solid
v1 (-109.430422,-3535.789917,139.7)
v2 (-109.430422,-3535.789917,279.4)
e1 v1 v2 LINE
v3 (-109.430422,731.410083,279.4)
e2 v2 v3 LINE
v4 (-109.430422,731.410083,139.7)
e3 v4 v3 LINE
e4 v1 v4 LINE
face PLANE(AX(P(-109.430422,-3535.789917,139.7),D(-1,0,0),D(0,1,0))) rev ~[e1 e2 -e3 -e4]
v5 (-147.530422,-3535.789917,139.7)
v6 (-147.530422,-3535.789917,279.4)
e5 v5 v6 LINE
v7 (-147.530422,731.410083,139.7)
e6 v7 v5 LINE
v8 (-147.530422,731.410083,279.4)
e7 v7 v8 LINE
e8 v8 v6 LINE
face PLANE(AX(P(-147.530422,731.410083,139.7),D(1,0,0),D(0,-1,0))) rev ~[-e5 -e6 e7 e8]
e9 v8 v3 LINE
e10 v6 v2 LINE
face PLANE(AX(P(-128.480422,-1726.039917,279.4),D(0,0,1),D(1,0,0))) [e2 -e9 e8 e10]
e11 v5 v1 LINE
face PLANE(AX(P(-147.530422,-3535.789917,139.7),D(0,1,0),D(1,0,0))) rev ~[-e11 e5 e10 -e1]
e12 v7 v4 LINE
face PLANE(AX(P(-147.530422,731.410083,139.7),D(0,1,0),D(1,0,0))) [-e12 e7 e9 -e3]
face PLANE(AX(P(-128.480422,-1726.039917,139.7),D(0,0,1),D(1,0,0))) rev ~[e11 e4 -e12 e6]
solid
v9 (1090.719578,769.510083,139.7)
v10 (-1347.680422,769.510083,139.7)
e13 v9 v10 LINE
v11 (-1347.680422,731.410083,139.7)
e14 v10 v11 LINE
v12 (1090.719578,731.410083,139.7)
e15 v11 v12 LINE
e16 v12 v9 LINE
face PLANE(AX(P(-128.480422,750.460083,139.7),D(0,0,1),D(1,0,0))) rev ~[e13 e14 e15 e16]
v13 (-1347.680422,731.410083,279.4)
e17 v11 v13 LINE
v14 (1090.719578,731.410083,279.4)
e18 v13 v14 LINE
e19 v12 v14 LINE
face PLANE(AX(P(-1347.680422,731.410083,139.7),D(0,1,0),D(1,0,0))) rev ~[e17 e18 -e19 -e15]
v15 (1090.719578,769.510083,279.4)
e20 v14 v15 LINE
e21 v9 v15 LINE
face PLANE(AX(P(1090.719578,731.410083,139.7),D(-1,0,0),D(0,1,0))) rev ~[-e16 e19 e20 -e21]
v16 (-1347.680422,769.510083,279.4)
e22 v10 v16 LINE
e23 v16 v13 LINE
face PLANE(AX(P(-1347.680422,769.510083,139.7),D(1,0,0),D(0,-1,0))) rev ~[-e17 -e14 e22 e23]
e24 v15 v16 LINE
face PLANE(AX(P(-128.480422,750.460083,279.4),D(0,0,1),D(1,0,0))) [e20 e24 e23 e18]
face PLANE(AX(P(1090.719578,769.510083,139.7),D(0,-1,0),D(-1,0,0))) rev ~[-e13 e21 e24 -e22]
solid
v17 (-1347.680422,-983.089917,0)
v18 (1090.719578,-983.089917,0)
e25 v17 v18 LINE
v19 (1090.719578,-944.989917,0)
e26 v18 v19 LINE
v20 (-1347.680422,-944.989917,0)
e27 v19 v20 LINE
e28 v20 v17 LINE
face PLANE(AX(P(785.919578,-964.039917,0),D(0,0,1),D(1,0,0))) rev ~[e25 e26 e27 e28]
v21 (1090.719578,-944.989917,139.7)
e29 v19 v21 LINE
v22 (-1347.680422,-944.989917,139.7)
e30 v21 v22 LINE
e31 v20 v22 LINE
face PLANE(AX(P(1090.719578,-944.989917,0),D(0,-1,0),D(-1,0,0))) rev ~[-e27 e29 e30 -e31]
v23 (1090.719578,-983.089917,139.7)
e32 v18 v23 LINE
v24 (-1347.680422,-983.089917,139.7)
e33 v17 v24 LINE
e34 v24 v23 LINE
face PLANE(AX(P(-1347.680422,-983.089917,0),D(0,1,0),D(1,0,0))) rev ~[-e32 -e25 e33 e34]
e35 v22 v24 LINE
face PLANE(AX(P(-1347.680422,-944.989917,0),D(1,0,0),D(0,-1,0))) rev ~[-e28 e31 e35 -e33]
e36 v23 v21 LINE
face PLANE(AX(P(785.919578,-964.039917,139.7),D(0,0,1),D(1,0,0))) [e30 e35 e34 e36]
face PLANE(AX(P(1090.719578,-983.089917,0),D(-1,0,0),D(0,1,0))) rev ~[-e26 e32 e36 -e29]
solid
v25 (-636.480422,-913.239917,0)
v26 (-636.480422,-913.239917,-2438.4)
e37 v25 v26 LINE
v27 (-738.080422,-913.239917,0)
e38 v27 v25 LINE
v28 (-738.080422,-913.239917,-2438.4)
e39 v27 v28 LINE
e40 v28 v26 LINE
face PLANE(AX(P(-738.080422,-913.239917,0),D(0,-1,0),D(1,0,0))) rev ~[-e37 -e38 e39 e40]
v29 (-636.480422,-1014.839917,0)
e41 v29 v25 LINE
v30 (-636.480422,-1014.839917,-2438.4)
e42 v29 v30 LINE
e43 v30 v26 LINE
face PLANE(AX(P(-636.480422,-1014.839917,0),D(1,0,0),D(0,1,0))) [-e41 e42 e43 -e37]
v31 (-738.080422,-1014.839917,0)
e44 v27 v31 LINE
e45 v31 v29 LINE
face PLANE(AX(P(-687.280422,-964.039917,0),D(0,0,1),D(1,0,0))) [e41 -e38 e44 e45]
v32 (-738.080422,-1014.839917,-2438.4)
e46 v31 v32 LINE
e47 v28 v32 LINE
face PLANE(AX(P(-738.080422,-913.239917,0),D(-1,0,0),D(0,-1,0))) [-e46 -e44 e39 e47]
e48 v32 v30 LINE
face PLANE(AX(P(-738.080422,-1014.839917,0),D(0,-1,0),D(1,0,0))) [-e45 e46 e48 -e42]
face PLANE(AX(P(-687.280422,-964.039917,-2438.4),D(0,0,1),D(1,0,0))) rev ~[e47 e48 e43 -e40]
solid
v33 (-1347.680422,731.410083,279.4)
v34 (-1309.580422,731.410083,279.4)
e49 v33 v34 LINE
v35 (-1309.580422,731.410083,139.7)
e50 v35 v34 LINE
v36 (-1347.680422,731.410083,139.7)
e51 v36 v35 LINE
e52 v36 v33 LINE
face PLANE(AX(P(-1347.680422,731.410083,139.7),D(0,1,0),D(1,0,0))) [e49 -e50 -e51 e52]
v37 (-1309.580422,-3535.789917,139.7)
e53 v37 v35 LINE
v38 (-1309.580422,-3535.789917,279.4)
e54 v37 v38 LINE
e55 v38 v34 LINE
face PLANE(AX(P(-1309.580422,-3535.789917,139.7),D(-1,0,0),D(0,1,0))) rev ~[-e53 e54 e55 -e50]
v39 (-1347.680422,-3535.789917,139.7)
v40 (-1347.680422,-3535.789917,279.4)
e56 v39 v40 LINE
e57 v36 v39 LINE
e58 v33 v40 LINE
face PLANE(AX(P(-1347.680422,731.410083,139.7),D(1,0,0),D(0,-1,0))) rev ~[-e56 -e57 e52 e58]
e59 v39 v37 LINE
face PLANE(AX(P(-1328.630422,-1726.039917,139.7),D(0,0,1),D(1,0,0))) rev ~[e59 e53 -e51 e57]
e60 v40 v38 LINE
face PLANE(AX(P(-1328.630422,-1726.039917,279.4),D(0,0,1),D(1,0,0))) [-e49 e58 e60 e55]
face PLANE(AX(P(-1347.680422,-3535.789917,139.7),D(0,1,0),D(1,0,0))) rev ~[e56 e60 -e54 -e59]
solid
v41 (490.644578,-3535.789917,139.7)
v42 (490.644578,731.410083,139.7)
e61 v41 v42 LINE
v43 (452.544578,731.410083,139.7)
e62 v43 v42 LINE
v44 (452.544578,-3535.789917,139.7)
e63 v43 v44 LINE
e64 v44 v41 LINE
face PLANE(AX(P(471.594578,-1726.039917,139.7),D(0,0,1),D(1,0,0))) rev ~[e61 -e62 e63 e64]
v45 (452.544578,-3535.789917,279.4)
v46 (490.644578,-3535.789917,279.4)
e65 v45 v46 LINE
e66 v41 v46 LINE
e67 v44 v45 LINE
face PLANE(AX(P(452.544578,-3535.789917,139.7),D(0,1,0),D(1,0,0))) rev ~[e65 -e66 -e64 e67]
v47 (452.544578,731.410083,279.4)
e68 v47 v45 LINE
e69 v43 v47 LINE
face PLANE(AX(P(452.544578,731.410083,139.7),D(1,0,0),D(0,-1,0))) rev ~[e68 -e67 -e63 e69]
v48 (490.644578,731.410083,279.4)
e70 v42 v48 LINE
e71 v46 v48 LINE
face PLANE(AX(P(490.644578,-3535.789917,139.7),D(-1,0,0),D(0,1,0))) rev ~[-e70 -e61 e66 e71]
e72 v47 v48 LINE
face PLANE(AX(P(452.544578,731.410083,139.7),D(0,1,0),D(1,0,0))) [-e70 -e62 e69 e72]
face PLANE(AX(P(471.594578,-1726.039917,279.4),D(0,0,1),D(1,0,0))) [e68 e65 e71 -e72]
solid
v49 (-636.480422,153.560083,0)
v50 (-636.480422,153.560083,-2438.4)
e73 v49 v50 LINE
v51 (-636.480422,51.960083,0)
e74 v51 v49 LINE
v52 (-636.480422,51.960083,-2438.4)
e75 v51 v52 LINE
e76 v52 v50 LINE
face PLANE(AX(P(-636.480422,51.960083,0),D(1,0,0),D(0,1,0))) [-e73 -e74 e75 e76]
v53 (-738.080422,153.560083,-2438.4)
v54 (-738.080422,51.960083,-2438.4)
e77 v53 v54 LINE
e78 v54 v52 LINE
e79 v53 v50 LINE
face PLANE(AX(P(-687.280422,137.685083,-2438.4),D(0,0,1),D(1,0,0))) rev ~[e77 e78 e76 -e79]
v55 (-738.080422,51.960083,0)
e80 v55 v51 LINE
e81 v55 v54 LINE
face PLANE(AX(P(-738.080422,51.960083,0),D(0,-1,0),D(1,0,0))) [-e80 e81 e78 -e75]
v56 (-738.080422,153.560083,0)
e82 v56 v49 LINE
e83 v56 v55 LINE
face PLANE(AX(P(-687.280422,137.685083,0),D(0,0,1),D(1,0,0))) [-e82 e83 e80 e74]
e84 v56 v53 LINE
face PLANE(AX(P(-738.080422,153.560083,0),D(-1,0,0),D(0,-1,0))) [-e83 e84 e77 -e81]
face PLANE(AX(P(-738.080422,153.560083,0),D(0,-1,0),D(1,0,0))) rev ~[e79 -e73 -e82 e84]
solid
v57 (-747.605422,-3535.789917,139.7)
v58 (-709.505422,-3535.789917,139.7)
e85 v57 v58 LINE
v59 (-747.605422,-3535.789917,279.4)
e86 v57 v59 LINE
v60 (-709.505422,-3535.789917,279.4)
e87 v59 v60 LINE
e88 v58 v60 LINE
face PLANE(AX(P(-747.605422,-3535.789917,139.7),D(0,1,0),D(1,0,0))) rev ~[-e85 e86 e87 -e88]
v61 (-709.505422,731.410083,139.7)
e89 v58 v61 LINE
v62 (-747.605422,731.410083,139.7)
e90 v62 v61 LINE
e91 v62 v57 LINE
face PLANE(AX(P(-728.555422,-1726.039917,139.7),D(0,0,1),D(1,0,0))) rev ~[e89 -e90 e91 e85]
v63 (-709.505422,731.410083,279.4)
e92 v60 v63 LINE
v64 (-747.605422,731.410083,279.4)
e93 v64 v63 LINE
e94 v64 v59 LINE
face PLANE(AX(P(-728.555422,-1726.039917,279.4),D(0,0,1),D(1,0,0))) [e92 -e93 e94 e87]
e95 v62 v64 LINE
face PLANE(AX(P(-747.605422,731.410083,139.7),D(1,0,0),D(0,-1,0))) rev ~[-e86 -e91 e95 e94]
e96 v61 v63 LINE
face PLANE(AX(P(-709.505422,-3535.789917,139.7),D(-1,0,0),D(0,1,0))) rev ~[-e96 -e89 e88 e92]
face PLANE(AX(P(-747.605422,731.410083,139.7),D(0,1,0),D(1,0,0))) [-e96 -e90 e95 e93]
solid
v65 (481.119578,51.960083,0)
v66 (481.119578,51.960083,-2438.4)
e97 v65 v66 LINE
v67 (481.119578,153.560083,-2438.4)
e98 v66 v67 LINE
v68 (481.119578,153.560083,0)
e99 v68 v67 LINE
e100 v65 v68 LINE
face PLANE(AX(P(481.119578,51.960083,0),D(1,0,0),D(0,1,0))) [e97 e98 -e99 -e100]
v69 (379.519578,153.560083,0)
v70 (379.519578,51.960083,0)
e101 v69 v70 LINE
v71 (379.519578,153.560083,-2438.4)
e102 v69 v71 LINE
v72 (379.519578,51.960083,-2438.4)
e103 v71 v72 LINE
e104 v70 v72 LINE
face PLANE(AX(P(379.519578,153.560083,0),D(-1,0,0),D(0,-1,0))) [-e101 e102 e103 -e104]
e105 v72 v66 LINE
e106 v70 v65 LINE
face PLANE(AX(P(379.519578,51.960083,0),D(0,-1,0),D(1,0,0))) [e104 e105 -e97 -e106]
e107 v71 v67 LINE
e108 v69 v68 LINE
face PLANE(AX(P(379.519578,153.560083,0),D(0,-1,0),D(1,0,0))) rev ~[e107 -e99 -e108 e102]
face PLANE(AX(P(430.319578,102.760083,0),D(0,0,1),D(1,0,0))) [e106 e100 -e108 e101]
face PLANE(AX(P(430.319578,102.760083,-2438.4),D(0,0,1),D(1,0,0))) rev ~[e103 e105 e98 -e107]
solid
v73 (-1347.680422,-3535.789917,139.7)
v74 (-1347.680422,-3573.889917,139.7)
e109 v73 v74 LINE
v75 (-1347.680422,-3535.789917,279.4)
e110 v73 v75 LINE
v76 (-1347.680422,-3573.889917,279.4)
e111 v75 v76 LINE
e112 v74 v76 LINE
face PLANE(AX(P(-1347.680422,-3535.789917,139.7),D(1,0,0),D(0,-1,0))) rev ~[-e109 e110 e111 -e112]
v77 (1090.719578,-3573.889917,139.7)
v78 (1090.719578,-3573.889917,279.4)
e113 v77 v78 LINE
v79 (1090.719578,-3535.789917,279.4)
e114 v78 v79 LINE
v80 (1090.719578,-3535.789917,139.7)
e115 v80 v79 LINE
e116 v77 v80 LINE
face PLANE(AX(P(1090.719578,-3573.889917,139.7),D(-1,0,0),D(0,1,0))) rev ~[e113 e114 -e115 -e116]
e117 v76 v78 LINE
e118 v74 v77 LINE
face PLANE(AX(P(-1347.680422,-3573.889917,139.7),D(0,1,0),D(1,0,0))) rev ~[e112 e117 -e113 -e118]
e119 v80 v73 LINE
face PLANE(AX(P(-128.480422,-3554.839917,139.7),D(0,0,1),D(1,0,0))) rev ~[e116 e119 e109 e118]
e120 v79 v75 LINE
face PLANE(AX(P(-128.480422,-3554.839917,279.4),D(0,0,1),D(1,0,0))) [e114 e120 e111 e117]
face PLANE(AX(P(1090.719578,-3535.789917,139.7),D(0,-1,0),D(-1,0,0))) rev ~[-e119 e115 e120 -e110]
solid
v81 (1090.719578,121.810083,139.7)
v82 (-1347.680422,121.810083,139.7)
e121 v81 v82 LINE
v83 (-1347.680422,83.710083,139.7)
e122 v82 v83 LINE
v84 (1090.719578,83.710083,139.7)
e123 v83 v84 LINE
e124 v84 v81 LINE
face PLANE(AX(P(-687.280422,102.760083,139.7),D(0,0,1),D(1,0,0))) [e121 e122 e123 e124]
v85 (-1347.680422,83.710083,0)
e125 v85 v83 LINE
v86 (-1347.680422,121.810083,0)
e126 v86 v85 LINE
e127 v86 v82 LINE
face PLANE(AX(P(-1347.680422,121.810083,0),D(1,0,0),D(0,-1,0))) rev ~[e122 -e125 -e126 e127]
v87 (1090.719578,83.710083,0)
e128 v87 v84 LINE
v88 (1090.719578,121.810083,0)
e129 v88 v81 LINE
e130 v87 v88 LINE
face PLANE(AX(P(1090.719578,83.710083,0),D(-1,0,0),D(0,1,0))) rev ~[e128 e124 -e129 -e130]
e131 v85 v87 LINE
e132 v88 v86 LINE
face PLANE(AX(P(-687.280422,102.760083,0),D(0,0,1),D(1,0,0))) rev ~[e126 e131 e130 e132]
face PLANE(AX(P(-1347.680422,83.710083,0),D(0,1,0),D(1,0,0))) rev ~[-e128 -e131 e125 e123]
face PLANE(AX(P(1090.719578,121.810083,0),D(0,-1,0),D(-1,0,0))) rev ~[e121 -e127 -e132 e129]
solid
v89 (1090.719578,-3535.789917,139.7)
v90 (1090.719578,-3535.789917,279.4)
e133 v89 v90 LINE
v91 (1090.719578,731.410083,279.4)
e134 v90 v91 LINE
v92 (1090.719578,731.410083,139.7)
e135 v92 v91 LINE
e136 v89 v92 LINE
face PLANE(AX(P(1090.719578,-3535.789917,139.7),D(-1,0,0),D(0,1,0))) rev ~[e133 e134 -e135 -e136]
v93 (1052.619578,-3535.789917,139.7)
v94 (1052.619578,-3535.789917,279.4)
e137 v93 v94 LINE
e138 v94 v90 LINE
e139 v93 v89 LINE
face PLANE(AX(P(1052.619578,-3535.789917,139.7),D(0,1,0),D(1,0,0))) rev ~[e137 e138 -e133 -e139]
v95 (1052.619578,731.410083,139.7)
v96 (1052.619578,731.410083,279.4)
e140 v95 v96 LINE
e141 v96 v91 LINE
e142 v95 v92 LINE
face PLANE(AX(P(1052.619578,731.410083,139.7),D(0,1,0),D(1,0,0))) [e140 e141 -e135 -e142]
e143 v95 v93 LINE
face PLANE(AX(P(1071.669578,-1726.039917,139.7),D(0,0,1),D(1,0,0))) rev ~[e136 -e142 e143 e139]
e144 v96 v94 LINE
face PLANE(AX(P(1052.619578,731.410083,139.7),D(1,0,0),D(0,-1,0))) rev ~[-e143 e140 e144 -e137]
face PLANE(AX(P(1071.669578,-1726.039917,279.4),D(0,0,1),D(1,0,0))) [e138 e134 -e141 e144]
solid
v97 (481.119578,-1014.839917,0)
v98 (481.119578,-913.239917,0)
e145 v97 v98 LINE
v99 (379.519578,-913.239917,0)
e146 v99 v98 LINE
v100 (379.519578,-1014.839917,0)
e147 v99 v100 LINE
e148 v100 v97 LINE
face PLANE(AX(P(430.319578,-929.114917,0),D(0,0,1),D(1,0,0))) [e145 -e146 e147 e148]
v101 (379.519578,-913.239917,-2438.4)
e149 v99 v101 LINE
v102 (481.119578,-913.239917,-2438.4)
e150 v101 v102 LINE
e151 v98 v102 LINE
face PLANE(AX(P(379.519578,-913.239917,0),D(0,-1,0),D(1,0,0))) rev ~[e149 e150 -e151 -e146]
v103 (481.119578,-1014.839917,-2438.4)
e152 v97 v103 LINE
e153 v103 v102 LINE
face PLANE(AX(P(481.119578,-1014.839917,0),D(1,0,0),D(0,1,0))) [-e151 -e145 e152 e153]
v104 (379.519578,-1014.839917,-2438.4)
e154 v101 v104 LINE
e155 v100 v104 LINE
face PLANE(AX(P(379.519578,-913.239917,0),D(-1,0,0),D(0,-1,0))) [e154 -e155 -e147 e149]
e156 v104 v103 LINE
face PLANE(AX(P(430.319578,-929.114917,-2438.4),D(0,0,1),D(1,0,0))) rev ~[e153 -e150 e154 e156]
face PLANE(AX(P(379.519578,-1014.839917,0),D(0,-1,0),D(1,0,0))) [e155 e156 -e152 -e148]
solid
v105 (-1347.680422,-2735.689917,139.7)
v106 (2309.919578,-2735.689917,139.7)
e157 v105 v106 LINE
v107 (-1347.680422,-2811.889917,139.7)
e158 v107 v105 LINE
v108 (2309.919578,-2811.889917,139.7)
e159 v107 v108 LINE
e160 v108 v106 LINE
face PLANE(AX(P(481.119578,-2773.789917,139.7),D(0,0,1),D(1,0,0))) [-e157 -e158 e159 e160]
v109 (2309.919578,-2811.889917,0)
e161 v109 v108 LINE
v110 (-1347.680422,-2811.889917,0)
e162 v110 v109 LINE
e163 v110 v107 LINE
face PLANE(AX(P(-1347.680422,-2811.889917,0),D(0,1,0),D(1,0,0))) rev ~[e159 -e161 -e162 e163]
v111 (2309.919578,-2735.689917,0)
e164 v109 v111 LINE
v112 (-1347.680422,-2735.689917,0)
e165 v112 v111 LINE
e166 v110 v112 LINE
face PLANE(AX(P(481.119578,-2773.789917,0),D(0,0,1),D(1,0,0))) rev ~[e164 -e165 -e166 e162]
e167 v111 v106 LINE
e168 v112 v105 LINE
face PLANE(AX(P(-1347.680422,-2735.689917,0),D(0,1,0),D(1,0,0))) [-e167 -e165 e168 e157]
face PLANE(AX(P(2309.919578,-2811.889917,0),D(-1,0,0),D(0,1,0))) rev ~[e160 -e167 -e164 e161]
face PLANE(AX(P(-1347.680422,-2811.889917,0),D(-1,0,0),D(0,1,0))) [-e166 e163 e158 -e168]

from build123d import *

# Parameters (mm, degrees)
F0_W     = 101.6
F0_H     = 31.75
F1_DEPTH = 2438.4
F0_H_2   = 38.1
F0_W_2   = 1016
F0_W_3   = 609.6
F2_DEPTH = 139.7
F0_W_4   = 3657.6
F0_H_3   = 76.2
F4_DEPTH = 139.7
F3_W     = 38.1
F3_H     = 3619.5
F3_H_2   = 38.1
F3_H_3   = 609.6
F5_DEPTH = 139.7


with BuildPart() as f1:
    # F0 (on Top) → F1 (new body)
    with BuildSketch(Plane.XY):
        with Locations((-687.2804223888, 137.6850830514)):
            Rectangle(F0_W, F0_H)
        Polygon((-636.4804223888, 121.8100830514), (-738.0804223888, 121.8100830514), (-738.0804223888, 102.7600830514), (-738.0804223888, 83.7100830514), (-636.4804223888, 83.7100830514), align=None)
        with Locations((-687.2804223888, 67.8350830514)):
            Rectangle(F0_W, F0_H)
    extrude(amount=-F1_DEPTH)


with BuildPart() as f1b:
    # F0 (on Top) → F1, piece 2 (new body)
    with BuildSketch(Plane.XY):
        with Locations((430.3195776112, 102.7600830514)):
            Rectangle(F0_W, F0_H_2)
        with Locations((430.3195776112, 137.6850830514)):
            Rectangle(F0_W, F0_H)
        with Locations((430.3195776112, 67.8350830514)):
            Rectangle(F0_W, F0_H)
    extrude(amount=-F1_DEPTH)


with BuildPart() as f1c:
    # F0 (on Top) → F1, piece 3 (new body)
    with BuildSketch(Plane.XY):
        with Locations((430.3195776112, -929.1149169486)):
            Rectangle(F0_W, F0_H)
        with Locations((430.3195776112, -964.0399169486)):
            Rectangle(F0_W, F0_H_2)
        with Locations((430.3195776112, -998.9649169486)):
            Rectangle(F0_W, F0_H)
    extrude(amount=-F1_DEPTH)


with BuildPart() as f1d:
    # F0 (on Top) → F1, piece 4 (new body)
    with BuildSketch(Plane.XY):
        Polygon((-636.4804223888, -983.0899169486), (-636.4804223888, -944.9899169486), (-738.0804223888, -944.9899169486), (-738.0804223888, -964.0399169486), (-738.0804223888, -983.0899169486), align=None)
        with Locations((-687.2804223888, -929.1149169486)):
            Rectangle(F0_W, F0_H)
        with Locations((-687.2804223888, -998.9649169486)):
            Rectangle(F0_W, F0_H)
    extrude(amount=-F1_DEPTH)


with BuildPart() as f2:
    # F0 (on Top) → F2 (new body)
    with BuildSketch(Plane.XY):
        Polygon((-636.4804223888, 121.8100830514), (-738.0804223888, 121.8100830514), (-738.0804223888, 102.7600830514), (-738.0804223888, 83.7100830514), (-636.4804223888, 83.7100830514), align=None)
        Polygon((-738.0804223888, 102.7600830514), (-738.0804223888, 121.8100830514), (-1347.6804223888, 121.8100830514), (-1347.6804223888, 83.7100830514), (-738.0804223888, 83.7100830514), align=None)
        with Locations((-128.4804223888, 102.7600830514)):
            Rectangle(F0_W_2, F0_H_2)
        with Locations((430.3195776112, 102.7600830514)):
            Rectangle(F0_W, F0_H_2)
        with Locations((785.9195776112, 102.7600830514)):
            Rectangle(F0_W_3, F0_H_2)
    extrude(amount=F2_DEPTH)


with BuildPart() as f2b:
    # F0 (on Top) → F2, piece 2 (new body)
    with BuildSketch(Plane.XY):
        with Locations((785.9195776112, -964.0399169486)):
            Rectangle(F0_W_3, F0_H_2)
        with Locations((430.3195776112, -964.0399169486)):
            Rectangle(F0_W, F0_H_2)
        with Locations((-128.4804223888, -964.0399169486)):
            Rectangle(F0_W_2, F0_H_2)
        Polygon((-636.4804223888, -983.0899169486), (-636.4804223888, -944.9899169486), (-738.0804223888, -944.9899169486), (-738.0804223888, -964.0399169486), (-738.0804223888, -983.0899169486), align=None)
        Polygon((-738.0804223888, -964.0399169486), (-738.0804223888, -944.9899169486), (-1347.6804223888, -944.9899169486), (-1347.6804223888, -983.0899169486), (-738.0804223888, -983.0899169486), align=None)
    extrude(amount=F2_DEPTH)


with BuildPart() as f2c:
    # F0 (on Top) → F2, piece 3 (new body)
    with BuildSketch(Plane.XY):
        with Locations((481.1195776112, -2773.7899169486)):
            Rectangle(F0_W_4, F0_H_3)
    extrude(amount=F2_DEPTH)


with BuildPart() as f4:
    # F3 (on face) → F4 (new body)
    with BuildSketch(Plane.XY.offset(139.7)):
        Polygon((-1347.6804223888, 769.5100830514), (-1347.6804223888, 731.4100830514), (-1309.5804223888, 731.4100830514), (-747.6054223888, 731.4100830514), (-709.5054223888, 731.4100830514), (-147.5304223888, 731.4100830514), (-109.4304223888, 731.4100830514), (452.5445776112, 731.4100830514), (490.6445776112, 731.4100830514), (1052.6195776112, 731.4100830514), (1090.7195776112, 731.4100830514), (1090.7195776112, 769.5100830514), align=None)
    extrude(amount=F4_DEPTH)


with BuildPart() as f4b:
    # F3 (on face) → F4, piece 2 (new body)
    with BuildSketch(Plane.XY.offset(139.7)):
        Polygon((-1309.5804223888, -3535.7899169486), (-1347.6804223888, -3535.7899169486), (-1347.6804223888, -3573.8899169486), (1090.7195776112, -3573.8899169486), (1090.7195776112, -3535.7899169486), (1052.6195776112, -3535.7899169486), (490.6445776112, -3535.7899169486), (452.5445776112, -3535.7899169486), (-109.4304223888, -3535.7899169486), (-147.5304223888, -3535.7899169486), (-709.5054223888, -3535.7899169486), (-747.6054223888, -3535.7899169486), align=None)
    extrude(amount=F4_DEPTH)


with BuildPart() as f5:
    # F3 (on face) → F5 (new body)
    with BuildSketch(Plane.XY.offset(139.7)):
        with Locations((-1328.6304223888, -1726.0399169486)):
            Rectangle(F3_W, F3_H)
        with Locations((-1328.6304223888, 102.7600830514)):
            Rectangle(F3_W, F3_H_2)
        with Locations((-1328.6304223888, 426.6100830514)):
            Rectangle(F3_W, F3_H_3)
    extrude(amount=F5_DEPTH)


with BuildPart() as f5b:
    # F3 (on face) → F5, piece 2 (new body)
    with BuildSketch(Plane.XY.offset(139.7)):
        with Locations((-728.5554223888, -1726.0399169486)):
            Rectangle(F3_W, F3_H)
        with Locations((-728.5554223888, 426.6100830514)):
            Rectangle(F3_W, F3_H_3)
        with Locations((-728.5554223888, 102.7600830514)):
            Rectangle(F3_W, F3_H_2)
    extrude(amount=F5_DEPTH)


with BuildPart() as f5c:
    # F3 (on face) → F5, piece 3 (new body)
    with BuildSketch(Plane.XY.offset(139.7)):
        with Locations((-128.4804223888, -1726.0399169486)):
            Rectangle(F3_W, F3_H)
        with Locations((-128.4804223888, 102.7600830514)):
            Rectangle(F3_W, F3_H_2)
        with Locations((-128.4804223888, 426.6100830514)):
            Rectangle(F3_W, F3_H_3)
    extrude(amount=F5_DEPTH)


with BuildPart() as f5d:
    # F3 (on face) → F5, piece 4 (new body)
    with BuildSketch(Plane.XY.offset(139.7)):
        with Locations((471.5945776112, -1726.0399169486)):
            Rectangle(F3_W, F3_H)
        with Locations((471.5945776112, 426.6100830514)):
            Rectangle(F3_W, F3_H_3)
        with Locations((471.5945776112, 102.7600830514)):
            Rectangle(F3_W, F3_H_2)
    extrude(amount=F5_DEPTH)


with BuildPart() as f5e:
    # F3 (on face) → F5, piece 5 (new body)
    with BuildSketch(Plane.XY.offset(139.7)):
        with Locations((1071.6695776112, -1726.0399169486)):
            Rectangle(F3_W, F3_H)
        with Locations((1071.6695776112, 426.6100830514)):
            Rectangle(F3_W, F3_H_3)
        with Locations((1071.6695776112, 102.7600830514)):
            Rectangle(F3_W, F3_H_2)
    extrude(amount=F5_DEPTH)


solid = Compound([f1.part, f1b.part, f1c.part, f1d.part, f2.part, f2b.part, f2c.part, f4.part, f4b.part, f5.part, f5b.part, f5c.part, f5d.part, f5e.part])
